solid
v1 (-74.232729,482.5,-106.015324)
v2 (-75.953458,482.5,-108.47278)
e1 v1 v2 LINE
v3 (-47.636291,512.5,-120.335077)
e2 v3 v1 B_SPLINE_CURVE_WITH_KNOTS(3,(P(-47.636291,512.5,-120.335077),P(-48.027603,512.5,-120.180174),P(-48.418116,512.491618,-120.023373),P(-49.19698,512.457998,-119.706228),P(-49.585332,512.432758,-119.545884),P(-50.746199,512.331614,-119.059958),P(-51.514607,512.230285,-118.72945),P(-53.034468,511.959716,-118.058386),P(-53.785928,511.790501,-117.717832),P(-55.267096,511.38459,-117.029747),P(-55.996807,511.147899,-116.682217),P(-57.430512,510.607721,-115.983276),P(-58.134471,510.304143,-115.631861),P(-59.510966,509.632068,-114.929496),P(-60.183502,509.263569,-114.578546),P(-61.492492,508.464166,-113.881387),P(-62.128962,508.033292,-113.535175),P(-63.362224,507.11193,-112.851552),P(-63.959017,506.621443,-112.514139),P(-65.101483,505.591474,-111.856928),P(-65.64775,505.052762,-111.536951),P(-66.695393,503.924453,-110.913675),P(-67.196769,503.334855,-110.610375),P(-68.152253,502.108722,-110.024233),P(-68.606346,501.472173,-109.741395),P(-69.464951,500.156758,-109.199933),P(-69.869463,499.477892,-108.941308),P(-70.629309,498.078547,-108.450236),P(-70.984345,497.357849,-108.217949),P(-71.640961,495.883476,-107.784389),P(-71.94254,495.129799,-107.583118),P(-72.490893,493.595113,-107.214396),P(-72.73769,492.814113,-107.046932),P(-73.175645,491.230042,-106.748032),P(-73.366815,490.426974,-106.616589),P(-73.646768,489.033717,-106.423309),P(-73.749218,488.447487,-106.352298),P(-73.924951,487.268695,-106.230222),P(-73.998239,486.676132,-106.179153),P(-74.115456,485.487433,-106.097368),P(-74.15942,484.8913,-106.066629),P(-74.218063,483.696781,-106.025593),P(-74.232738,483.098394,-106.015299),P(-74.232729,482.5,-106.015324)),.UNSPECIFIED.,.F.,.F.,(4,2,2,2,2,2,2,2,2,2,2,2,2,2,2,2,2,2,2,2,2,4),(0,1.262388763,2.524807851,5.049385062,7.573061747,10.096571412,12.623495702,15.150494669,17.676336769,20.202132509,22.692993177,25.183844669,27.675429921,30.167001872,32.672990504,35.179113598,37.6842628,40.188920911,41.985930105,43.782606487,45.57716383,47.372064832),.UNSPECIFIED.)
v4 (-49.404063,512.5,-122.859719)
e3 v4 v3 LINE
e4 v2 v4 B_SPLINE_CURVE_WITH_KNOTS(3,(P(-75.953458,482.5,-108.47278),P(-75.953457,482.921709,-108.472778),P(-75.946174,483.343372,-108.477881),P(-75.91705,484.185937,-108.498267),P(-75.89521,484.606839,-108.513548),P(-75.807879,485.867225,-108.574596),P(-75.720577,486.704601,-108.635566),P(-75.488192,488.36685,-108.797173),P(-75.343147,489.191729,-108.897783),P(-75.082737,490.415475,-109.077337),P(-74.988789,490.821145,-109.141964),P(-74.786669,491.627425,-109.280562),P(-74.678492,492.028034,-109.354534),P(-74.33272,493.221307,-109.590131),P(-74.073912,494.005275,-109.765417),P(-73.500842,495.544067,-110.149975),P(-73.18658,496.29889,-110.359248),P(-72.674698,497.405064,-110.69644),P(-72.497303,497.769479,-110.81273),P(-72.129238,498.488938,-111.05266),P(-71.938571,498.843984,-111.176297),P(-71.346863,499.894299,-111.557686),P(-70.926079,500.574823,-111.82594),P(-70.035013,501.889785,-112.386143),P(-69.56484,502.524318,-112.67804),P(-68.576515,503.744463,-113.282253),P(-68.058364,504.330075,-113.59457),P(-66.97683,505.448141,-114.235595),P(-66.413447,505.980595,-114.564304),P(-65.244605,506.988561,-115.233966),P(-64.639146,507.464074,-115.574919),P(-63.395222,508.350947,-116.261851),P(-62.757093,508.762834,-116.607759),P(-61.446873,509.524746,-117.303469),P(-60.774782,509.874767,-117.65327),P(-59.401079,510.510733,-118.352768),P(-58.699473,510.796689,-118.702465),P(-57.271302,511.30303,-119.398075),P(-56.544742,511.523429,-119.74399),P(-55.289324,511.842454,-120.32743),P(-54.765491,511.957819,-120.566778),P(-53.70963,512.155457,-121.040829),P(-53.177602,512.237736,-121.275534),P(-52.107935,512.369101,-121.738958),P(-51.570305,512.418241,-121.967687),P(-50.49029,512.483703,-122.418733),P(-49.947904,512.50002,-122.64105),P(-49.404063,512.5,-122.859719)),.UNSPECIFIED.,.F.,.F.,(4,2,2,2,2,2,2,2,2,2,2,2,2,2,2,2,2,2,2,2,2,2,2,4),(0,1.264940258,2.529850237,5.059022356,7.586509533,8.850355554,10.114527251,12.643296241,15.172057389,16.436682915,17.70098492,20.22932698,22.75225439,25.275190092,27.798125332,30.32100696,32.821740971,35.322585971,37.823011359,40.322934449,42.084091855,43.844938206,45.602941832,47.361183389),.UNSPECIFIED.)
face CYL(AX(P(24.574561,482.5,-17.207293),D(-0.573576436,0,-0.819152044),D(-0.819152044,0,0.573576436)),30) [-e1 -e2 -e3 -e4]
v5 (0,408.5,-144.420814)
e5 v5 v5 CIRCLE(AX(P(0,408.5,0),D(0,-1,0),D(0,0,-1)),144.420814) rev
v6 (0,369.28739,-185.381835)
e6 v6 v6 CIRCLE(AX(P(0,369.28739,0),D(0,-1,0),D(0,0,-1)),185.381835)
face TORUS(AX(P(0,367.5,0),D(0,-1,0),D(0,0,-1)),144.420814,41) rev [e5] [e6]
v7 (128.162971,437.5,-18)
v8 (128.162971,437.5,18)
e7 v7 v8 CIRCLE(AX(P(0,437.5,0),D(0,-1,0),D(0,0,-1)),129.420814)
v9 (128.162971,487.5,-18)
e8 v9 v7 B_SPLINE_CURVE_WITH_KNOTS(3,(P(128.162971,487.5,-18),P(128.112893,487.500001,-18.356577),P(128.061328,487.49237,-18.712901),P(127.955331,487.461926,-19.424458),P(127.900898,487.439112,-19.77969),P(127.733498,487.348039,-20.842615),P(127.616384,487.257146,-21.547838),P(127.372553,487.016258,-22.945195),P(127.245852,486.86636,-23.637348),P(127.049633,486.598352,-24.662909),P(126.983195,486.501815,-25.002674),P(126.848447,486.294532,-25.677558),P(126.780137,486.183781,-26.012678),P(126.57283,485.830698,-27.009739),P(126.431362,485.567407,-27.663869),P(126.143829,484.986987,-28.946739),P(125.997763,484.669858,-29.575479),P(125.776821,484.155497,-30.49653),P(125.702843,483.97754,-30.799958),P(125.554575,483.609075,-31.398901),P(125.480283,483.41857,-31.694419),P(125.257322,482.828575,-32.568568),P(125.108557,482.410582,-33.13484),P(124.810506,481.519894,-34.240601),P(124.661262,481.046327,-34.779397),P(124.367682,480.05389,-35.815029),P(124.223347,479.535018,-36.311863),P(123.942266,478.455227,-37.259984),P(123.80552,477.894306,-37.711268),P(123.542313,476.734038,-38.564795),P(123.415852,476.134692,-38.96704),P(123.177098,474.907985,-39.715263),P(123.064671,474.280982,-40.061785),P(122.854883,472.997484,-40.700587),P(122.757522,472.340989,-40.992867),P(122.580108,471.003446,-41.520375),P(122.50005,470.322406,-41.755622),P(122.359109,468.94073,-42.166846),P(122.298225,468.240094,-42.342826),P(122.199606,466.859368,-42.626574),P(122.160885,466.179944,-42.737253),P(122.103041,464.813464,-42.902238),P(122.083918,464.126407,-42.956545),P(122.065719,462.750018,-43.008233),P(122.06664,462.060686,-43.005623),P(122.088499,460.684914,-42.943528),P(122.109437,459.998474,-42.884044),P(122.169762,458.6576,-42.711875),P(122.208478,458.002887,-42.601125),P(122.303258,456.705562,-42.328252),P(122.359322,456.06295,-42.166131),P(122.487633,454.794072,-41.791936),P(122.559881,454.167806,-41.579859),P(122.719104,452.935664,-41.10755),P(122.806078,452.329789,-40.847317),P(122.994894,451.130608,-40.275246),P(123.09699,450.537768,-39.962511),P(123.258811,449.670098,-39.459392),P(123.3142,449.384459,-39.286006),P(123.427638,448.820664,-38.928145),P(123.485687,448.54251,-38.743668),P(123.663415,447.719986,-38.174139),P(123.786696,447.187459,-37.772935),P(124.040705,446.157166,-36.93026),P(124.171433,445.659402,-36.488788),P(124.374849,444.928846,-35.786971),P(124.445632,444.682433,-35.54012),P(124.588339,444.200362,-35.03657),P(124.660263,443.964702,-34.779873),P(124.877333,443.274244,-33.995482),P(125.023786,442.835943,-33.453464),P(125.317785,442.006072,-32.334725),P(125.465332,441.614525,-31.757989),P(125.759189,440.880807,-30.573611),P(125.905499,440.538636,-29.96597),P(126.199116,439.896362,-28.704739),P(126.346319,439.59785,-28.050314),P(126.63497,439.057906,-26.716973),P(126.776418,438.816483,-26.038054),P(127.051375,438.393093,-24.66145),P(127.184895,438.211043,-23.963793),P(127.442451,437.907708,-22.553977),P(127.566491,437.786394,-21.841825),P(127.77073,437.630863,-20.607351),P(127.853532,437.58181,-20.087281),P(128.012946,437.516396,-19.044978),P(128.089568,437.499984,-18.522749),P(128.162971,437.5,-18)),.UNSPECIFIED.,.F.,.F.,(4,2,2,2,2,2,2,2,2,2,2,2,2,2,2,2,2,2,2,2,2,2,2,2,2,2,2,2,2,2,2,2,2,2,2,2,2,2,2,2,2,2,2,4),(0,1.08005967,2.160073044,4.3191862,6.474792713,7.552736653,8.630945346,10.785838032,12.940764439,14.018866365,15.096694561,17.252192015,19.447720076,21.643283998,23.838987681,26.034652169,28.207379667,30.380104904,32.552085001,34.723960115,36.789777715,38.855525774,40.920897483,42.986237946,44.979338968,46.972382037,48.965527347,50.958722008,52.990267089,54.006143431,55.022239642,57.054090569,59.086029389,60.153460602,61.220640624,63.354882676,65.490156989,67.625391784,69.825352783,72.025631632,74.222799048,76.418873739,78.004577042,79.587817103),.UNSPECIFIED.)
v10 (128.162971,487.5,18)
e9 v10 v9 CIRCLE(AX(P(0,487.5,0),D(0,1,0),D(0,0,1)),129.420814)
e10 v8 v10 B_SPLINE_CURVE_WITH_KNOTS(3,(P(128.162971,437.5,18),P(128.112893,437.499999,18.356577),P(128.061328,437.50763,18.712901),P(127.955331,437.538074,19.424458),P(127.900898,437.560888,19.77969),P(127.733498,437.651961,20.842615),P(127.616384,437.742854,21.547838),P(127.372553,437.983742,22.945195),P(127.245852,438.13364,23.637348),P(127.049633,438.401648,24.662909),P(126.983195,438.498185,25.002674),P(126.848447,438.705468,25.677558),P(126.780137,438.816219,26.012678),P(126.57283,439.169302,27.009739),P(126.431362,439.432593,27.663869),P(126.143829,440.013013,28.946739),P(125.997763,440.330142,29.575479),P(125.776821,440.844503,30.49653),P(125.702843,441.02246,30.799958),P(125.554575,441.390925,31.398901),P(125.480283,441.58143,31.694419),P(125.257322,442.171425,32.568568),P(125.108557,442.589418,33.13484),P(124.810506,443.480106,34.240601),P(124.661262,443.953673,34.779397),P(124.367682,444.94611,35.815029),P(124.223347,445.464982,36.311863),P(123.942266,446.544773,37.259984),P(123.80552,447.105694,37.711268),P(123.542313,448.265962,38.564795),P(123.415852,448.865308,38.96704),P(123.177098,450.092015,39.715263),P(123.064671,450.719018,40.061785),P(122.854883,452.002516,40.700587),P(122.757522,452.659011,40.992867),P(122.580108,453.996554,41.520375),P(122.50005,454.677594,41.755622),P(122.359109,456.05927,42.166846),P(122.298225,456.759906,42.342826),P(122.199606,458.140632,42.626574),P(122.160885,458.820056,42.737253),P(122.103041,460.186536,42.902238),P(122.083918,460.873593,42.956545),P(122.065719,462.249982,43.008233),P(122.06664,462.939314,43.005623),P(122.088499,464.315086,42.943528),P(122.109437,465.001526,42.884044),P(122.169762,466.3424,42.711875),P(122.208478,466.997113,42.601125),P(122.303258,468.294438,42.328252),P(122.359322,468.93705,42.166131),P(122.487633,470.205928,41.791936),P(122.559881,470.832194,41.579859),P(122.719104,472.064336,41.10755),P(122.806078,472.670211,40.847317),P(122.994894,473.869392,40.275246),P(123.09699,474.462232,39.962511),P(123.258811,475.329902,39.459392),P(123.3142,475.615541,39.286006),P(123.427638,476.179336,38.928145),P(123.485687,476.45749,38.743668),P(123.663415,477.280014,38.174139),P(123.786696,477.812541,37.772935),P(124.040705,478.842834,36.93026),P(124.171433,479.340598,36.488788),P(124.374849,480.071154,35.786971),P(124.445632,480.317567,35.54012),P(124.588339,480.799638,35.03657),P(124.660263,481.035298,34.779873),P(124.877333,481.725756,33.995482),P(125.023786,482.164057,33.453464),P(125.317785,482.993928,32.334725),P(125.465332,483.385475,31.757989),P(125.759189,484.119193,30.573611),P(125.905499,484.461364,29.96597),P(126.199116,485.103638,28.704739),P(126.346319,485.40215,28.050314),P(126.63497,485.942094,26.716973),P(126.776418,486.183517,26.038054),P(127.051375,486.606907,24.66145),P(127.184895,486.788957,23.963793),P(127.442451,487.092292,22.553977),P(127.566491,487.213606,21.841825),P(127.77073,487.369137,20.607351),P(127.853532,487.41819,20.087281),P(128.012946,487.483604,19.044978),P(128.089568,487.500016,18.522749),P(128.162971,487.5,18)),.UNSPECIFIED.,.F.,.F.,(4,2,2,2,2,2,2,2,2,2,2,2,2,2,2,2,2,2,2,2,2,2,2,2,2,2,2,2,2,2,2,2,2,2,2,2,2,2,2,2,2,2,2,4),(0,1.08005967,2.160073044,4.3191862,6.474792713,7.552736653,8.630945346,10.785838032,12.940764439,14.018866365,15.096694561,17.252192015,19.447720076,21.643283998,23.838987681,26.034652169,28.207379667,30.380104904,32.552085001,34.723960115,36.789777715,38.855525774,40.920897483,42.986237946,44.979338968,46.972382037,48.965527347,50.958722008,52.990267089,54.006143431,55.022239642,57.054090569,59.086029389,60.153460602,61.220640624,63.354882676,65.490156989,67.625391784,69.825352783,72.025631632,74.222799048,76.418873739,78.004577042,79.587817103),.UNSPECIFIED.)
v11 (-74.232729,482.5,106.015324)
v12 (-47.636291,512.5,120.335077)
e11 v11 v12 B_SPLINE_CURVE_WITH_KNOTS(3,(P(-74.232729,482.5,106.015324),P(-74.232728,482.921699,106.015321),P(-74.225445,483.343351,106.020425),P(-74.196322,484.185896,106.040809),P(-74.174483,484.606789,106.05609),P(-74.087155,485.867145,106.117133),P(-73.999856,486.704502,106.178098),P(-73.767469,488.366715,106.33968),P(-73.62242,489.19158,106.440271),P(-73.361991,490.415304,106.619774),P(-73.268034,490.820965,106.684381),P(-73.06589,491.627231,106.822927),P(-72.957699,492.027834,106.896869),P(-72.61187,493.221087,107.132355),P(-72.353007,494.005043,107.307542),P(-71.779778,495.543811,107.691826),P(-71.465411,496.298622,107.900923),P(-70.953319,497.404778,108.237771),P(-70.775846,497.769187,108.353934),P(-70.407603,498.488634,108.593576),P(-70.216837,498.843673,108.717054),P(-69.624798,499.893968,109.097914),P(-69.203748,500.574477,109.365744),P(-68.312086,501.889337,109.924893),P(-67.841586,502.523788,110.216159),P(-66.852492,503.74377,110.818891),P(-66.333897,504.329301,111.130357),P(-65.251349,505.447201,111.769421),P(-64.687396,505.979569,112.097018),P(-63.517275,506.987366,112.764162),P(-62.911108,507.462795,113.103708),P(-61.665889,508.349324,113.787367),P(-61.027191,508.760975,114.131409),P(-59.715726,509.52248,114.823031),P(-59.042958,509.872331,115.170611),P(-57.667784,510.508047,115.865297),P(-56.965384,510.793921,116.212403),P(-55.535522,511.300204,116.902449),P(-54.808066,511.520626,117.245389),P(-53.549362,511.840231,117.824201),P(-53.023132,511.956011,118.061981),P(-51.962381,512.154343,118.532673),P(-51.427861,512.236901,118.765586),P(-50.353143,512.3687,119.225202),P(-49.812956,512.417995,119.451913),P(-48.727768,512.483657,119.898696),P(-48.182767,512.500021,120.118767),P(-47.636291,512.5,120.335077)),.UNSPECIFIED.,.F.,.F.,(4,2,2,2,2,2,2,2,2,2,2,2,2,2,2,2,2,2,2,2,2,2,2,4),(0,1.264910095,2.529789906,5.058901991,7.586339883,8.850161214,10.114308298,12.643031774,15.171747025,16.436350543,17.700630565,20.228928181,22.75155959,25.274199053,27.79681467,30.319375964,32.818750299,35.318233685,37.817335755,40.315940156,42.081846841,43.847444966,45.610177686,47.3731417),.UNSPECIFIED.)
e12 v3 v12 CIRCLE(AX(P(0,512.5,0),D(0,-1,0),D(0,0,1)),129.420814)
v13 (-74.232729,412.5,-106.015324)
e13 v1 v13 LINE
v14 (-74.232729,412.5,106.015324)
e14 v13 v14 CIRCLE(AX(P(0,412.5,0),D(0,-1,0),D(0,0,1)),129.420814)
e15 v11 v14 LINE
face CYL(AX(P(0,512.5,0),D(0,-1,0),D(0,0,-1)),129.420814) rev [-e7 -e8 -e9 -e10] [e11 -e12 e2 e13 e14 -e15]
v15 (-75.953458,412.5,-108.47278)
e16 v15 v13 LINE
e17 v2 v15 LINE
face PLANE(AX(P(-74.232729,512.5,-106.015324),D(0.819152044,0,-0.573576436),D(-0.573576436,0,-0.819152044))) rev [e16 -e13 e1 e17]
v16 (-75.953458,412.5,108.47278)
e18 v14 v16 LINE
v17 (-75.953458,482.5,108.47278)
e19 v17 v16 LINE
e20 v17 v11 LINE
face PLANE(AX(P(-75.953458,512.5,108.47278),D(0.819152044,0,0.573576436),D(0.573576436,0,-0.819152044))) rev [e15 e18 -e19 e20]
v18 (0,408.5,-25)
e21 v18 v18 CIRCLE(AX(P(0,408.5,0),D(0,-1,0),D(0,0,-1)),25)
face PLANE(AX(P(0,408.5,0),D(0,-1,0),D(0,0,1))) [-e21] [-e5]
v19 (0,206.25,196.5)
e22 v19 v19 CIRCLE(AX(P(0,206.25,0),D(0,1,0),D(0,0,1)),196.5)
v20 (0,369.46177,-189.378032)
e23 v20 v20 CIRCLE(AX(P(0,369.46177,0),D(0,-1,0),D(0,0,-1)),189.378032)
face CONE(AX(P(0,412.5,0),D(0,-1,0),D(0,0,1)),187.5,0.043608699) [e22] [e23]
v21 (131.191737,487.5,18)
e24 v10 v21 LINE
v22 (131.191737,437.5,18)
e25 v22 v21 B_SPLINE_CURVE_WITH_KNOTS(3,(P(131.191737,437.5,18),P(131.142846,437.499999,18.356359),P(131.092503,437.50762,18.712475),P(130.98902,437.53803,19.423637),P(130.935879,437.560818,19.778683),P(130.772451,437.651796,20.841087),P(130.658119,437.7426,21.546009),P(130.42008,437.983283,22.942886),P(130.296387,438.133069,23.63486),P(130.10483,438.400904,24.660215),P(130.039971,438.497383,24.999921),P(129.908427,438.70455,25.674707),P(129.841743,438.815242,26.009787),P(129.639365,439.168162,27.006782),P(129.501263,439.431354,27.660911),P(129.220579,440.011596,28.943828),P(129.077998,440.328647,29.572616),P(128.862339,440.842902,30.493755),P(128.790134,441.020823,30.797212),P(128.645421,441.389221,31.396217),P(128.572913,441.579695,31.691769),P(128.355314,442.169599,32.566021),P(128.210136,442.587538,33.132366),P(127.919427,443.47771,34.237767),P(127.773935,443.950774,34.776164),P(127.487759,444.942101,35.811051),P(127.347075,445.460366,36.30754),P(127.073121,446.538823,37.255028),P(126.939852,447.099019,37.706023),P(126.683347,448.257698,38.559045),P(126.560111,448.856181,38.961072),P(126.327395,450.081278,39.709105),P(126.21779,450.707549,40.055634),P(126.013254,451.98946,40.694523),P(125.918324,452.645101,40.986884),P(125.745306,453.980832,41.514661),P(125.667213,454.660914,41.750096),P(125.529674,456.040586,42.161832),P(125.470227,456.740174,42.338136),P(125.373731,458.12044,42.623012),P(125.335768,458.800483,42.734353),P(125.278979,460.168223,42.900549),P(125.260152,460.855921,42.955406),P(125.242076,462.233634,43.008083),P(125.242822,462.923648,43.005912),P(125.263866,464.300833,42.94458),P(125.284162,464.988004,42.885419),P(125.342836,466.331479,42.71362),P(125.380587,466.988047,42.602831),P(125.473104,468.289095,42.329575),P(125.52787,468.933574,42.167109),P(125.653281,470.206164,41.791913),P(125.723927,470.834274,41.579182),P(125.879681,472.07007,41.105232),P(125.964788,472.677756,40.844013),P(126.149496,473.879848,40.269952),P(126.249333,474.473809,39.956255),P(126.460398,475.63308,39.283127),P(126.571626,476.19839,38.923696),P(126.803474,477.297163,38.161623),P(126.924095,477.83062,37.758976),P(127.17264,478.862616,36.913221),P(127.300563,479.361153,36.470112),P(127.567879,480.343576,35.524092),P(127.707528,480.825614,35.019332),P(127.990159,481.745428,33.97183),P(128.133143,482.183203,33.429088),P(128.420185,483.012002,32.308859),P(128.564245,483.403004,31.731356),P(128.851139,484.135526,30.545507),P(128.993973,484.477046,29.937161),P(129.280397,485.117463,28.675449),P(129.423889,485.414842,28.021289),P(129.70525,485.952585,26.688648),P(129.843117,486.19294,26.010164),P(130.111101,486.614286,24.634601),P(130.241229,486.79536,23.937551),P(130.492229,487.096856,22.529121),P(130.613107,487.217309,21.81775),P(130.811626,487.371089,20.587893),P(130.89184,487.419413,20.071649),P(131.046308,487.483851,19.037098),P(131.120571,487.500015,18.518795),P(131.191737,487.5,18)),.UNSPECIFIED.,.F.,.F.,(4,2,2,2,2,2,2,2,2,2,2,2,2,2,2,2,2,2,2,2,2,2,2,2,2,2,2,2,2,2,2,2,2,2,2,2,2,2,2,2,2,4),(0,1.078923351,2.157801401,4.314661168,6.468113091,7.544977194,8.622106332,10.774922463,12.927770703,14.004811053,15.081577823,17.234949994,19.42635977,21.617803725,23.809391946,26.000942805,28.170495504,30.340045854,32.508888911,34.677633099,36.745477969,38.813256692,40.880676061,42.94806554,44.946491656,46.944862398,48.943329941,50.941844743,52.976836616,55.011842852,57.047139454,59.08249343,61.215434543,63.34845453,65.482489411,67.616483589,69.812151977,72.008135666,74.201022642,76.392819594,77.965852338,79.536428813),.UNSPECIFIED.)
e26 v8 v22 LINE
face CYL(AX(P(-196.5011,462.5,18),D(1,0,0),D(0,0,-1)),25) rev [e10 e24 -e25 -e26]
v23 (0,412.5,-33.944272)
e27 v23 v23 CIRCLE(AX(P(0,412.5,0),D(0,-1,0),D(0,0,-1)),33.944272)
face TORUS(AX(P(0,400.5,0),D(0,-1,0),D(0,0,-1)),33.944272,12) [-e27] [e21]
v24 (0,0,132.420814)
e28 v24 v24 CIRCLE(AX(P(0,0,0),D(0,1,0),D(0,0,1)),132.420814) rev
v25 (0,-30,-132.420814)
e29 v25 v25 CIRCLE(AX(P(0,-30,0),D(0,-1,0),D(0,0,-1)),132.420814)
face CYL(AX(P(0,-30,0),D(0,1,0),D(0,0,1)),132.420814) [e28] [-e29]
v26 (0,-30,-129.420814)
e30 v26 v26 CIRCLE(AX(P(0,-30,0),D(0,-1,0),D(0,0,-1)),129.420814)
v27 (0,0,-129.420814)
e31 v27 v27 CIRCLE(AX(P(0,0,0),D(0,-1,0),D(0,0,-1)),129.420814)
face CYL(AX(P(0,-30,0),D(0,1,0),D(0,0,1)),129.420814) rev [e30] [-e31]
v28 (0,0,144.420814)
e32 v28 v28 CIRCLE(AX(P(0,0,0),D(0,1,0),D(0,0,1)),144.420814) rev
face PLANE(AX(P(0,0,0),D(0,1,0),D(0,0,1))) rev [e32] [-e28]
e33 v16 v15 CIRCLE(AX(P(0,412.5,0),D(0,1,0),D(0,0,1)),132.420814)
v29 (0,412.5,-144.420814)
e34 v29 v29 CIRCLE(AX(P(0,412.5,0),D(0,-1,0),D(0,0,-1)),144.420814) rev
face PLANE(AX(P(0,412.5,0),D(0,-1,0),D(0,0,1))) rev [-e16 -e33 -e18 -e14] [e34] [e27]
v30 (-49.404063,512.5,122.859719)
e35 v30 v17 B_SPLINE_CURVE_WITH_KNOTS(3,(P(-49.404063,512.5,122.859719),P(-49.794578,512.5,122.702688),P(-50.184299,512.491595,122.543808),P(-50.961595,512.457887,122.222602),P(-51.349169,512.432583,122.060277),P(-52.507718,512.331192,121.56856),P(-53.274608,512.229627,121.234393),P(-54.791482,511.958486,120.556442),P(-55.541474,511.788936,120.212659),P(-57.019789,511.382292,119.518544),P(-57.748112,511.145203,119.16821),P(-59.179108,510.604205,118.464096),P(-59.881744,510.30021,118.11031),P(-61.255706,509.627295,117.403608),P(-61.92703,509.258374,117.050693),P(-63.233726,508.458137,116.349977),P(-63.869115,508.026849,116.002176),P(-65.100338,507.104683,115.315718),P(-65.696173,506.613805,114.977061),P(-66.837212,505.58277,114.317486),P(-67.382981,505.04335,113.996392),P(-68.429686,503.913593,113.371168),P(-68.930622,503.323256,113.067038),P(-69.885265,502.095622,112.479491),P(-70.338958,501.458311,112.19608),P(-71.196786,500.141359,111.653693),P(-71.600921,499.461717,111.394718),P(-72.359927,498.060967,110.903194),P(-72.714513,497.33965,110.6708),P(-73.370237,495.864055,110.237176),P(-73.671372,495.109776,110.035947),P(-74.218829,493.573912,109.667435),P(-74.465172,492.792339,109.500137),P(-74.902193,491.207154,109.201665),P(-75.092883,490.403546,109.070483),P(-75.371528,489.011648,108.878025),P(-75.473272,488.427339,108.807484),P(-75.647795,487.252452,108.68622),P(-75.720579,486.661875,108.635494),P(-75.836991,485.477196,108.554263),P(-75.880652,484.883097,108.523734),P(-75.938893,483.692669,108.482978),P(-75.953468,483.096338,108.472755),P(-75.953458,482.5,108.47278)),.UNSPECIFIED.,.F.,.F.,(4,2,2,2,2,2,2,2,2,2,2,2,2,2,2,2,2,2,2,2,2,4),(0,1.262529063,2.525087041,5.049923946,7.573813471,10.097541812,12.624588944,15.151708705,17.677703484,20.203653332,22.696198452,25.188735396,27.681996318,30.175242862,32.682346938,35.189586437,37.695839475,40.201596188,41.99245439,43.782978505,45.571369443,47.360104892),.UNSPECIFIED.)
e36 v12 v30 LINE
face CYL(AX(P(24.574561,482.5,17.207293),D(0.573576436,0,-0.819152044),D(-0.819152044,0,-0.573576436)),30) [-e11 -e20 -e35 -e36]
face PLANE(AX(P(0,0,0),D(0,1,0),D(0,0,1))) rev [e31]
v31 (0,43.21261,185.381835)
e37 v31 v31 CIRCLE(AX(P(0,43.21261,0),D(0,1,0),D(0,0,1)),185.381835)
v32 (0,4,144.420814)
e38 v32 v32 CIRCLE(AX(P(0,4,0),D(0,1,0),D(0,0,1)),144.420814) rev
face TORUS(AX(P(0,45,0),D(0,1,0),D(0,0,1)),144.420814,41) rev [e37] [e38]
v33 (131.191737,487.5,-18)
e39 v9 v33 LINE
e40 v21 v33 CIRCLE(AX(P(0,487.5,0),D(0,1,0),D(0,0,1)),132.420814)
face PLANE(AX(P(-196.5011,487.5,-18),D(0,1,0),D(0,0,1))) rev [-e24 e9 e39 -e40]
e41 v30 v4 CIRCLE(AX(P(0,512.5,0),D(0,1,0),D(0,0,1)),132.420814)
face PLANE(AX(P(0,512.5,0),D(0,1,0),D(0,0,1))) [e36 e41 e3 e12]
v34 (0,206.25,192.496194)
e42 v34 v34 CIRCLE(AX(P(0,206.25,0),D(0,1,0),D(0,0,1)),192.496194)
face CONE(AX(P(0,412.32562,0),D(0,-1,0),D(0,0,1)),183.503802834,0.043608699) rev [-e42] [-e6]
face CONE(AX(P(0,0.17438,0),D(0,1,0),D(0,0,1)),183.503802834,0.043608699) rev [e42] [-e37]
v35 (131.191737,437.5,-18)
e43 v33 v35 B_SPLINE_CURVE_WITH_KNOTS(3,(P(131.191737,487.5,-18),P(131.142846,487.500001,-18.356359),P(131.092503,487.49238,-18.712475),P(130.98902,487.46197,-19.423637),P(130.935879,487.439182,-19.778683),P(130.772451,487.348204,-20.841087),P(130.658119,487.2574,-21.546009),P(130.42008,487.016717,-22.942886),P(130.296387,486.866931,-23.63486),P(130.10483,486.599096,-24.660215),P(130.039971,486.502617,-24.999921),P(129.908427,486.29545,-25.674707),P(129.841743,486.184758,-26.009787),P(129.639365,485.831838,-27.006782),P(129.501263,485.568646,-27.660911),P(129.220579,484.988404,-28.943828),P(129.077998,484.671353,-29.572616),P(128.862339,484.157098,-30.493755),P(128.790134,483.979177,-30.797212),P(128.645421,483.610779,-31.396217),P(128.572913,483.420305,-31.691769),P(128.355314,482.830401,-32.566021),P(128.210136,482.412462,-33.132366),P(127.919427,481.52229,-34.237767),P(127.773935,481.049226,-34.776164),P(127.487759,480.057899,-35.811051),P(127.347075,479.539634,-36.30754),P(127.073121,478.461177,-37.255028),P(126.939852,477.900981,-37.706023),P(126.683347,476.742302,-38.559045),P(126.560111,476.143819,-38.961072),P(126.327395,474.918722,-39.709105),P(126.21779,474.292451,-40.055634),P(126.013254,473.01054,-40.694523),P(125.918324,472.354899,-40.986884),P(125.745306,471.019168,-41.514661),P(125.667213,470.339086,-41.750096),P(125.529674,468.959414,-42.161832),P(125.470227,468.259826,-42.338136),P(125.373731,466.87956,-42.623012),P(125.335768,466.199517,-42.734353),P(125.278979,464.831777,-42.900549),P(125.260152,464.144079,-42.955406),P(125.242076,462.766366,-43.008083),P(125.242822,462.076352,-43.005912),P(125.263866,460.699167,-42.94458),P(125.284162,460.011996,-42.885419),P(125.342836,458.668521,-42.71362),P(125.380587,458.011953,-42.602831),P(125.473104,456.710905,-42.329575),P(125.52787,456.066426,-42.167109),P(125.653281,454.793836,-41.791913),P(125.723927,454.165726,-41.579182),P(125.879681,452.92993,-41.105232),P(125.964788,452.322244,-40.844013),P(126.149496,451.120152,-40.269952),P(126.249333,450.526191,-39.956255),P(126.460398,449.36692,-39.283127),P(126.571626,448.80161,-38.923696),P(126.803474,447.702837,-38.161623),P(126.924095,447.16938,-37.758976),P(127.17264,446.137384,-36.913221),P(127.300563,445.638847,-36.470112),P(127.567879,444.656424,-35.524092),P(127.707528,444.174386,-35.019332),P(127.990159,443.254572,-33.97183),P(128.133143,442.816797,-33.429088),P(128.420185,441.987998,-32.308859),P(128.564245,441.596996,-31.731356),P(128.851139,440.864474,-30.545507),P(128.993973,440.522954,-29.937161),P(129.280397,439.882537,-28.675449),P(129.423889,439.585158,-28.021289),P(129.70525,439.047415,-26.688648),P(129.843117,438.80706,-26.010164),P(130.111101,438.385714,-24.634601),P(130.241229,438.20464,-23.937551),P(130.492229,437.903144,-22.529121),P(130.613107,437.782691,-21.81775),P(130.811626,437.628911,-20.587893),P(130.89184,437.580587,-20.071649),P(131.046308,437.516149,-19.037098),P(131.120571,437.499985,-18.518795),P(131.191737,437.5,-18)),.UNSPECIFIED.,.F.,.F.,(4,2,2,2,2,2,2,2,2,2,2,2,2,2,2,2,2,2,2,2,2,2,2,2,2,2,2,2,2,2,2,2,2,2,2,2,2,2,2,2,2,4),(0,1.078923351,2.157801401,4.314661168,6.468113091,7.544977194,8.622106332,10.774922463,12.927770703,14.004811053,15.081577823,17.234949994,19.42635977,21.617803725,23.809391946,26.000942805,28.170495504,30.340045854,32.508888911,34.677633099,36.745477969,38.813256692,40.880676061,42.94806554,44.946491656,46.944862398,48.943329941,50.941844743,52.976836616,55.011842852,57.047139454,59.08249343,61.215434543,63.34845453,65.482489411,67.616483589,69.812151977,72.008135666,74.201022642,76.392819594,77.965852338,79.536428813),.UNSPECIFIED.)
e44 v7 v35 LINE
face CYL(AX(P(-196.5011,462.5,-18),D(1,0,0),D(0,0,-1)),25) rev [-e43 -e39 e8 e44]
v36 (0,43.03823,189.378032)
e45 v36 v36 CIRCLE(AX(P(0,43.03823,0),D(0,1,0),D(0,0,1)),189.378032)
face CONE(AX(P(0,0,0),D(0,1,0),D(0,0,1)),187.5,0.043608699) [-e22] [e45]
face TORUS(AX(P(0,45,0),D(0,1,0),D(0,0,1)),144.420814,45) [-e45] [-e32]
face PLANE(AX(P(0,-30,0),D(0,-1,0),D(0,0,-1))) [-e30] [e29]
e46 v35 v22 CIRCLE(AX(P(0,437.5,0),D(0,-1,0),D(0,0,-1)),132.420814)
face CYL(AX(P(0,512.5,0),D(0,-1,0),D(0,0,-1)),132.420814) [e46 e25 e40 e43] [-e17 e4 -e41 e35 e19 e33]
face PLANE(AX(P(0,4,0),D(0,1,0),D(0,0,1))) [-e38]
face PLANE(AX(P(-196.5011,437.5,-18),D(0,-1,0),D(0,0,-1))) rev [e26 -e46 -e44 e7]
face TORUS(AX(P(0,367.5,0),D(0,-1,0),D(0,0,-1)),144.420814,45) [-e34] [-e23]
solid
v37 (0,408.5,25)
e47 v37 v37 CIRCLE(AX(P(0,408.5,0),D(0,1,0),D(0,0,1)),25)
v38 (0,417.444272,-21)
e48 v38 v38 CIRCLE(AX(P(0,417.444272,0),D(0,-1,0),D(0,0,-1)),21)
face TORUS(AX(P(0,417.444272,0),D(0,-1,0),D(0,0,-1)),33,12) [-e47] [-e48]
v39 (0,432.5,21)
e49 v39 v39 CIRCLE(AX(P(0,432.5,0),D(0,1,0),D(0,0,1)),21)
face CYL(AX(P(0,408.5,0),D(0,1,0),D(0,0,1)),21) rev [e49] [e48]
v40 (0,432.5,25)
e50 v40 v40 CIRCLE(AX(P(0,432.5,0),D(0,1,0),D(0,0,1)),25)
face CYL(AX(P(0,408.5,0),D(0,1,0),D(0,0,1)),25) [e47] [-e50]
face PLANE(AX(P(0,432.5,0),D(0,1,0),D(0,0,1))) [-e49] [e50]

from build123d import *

# Parameters (mm, degrees)
SKETCH2_R                = 196.5
SKETCH1_R                = 187.50000000000006
FILLET1_R                = 45
CUT_EXTRUDE2_START       = -4
CUT_EXTRUDE2_OUTLINE_R   = 25
CUT_EXTRUDE2_DEPTH       = 4
BOSS_EXTRUDE3_DEPTH      = 20
BOSS_EXTRUDE3_DEPTH_BACK = 4
SKETCH8_R                = 25
SKETCH8_R_2              = 21
FILLET6_R                = 12
FILLET7_R                = 12
SKETCH9_R                = 132.4208137637083
SKETCH9_R_2              = 129.4208137637083
BOSS_EXTRUDE4_DEPTH      = 30
BOSS_EXTRUDE5_START      = 100
BOSS_EXTRUDE5_DEPTH      = 100
FILLET8_START            = -133
FILLET8_DEPTH            = 200.891870951
FILLET8_2_DEPTH          = 200.700119068
CUT_EXTRUDE3_REACH       = 641.889
CUT_EXTRUDE3_END_RADIUS  = 129.42081376370834


with BuildPart() as part:
    # Sketch2 → Loft1 section 0
    with BuildSketch(Plane(origin=(0, 206.25, 0), x_dir=(1, 0, 0), z_dir=(0, 1, 0))):
        Circle(SKETCH2_R)
    # Sketch1 → Loft1 section 1
    with BuildSketch(Plane(origin=(0, 0, 0), x_dir=(1, 0, 0), z_dir=(0, 1, 0))):
        Circle(SKETCH1_R)
    loft1 = loft()

    # Mirror1: Loft1 across plane
    add(loft1.mirror(Plane.ZX.offset(206.25)))

    # Fillet1
    fillet1_edges = [part.edges().sort_by_distance(p)[0] for p in [
        (-187.50000000000006, 0, -2.296e-14),
        (-187.50000000000006, 412.5, -2.296e-14),
    ]]
    fillet(fillet1_edges, radius=FILLET1_R)

    # Shell1: read off the stored shape, not the designer's step
    # Shell1 outline → Shell1 (revolve, cut)
    with BuildSketch(Plane.XY):
        with BuildLine():
            Line((0, 408.5), (0, 4))
            Line((0, 4), (144.420813764, 4))
            ThreePointArc((144.420813764, 4), (172.773212338, 15.383425331), (185.38183471, 43.212609995))
            Line((185.38183471, 43.212609995), (192.496193547, 206.25))
            Line((192.496193547, 206.25), (185.38183471, 369.287390005))
            ThreePointArc((185.38183471, 369.287390005), (172.773212338, 397.116574669), (144.420813764, 408.5))
            Line((144.420813764, 408.5), (0, 408.5))
        make_face()
    revolve(axis=Axis((0, 0, 0), (0, 1, 0)), mode=Mode.SUBTRACT)

    # Cut-Extrude2: read off the stored shape, not the designer's step
    # Cut-Extrude2 outline → Cut-Extrude2 (cut)
    with BuildSketch(Plane(origin=(0, 412.5, 0), x_dir=(1, 0, 0), z_dir=(0, 1, 0)).offset(CUT_EXTRUDE2_START)):
        Circle(CUT_EXTRUDE2_OUTLINE_R)
    extrude(amount=CUT_EXTRUDE2_DEPTH, mode=Mode.SUBTRACT)

    # Fillet7
    # the kernel refuses this fillet: 12 mm, written as the material it takes off along each edge
    with BuildSketch(Plane(origin=(0, 412.5, 0), x_dir=(1, 0, 0), z_dir=(0, 0, 1))) as fillet7_piece_1:
        with BuildLine():
            CenterArc((33.94427190999916, -12), FILLET7_R, 90, 48.18968510422141)
            Line((25, -4), (24.821114561800016, -3.839999999999975))
            ThreePointArc((24.821114561800016, -3.839999999999975), (24.76, -2), (24.76, 0))
            Line((24.76, 0), (25, 0.2400000000000091))
            Line((25, 0.2400000000000091), (33.94427190999916, 0.2400000000000091))
            Line((33.94427190999916, 0.2400000000000091), (33.94427190999916, 0))
        make_face()
    revolve(axis=Axis((0, 412.5, 0), (0, 1, 0)), mode=Mode.SUBTRACT)

    # Sketch9 → Boss-Extrude4 (add)
    with BuildSketch(Plane.XZ):
        with Locations(Location((0, 0, 0), (0, 0, 90))):
            Circle(SKETCH9_R)
        with Locations(Location((0, 0, 0), (0, 0, 270))):
            Circle(SKETCH9_R_2, mode=Mode.SUBTRACT)
    extrude(amount=BOSS_EXTRUDE4_DEPTH)

    # Sketch10 → Boss-Extrude5 (add)
    with BuildSketch(Plane(origin=(0, 412.5, 0), x_dir=(1, 0, 0), z_dir=(0, 1, 0)).offset(BOSS_EXTRUDE5_START)):
        with BuildLine():
            Line((-75.95345845729307, -108.47278030095376), (-74.23272914823994, -106.01532416808678))
            ThreePointArc((-74.23272914823994, -106.01532416808678), (129.42081376370834, 5.747e-14), (-74.23272914824004, 106.01532416808674))
            Line((-74.23272914824004, 106.01532416808674), (-75.95345845729317, 108.4727803009537))
            ThreePointArc((-75.95345845729317, 108.4727803009537), (132.42081376370834, 5.881e-14), (-75.95345845729307, -108.47278030095376))
        make_face()
    extrude(amount=-BOSS_EXTRUDE5_DEPTH)

    # Fillet8: read off the stored shape, not the designer's step
    # Fillet8 outline → Fillet8 (cut)
    with BuildSketch(Plane(origin=(0, 0, 0), x_dir=(0.8191520442889931, 0, -0.5735764363510442), z_dir=(0.5735764363510442, 0, 0.8191520442889932)).offset(FILLET8_START)):
        with BuildLine():
            Line((0, 512.5), (0, 482.5))
            ThreePointArc((0, 482.5), (8.786796564, 503.713203436), (30, 512.5))
            Line((30, 512.5), (0, 512.5))
        make_face()
    extrude(amount=FILLET8_DEPTH, mode=Mode.SUBTRACT)

    # Fillet8 2 outline → Fillet8 2 (cut)
    with BuildSketch(Plane(origin=(0, 0, 0), x_dir=(0.8191520442889947, 0, 0.5735764363510419), z_dir=(0.5735764363510419, 0, -0.8191520442889948)).offset(FILLET8_START)):
        with BuildLine():
            ThreePointArc((30, -512.5), (8.786796564, -503.713203436), (0, -482.5))
            Line((0, -482.5), (0, -512.5))
            Line((0, -512.5), (30, -512.5))
        make_face()
    extrude(amount=FILLET8_2_DEPTH, mode=Mode.SUBTRACT)

    # Cut-Extrude3: up to this cylinder (the profile starts outside it)
    cut_extrude3_end = Plane(origin=(0, 462.5, 0), z_dir=(0, -1, 0)) * Cylinder(CUT_EXTRUDE3_END_RADIUS, 1543.6196275274167, mode=Mode.PRIVATE)
    # Sketch11 → Cut-Extrude3 (cut, up to the surface)
    with BuildSketch(Plane(origin=(132.42081376370834, 0, 0), x_dir=(0, 0, -1), z_dir=(1, 0, 0)), mode=Mode.PRIVATE) as cut_extrude3_sk1:
        with BuildLine():
            Line((18.000000000000057, 437.5), (-18.00000000000005, 437.5))
            ThreePointArc((-18.00000000000005, 437.5), (-43.00000000000006, 462.49999999999994), (-18.000000000000053, 487.49999999999994))
            Line((-18.000000000000053, 487.49999999999994), (17.999999999999932, 487.5))
            ThreePointArc((17.999999999999932, 487.5), (43, 462.5), (18.000000000000057, 437.5))
        make_face()
    cut_extrude3_tool1 = extrude(cut_extrude3_sk1.sketch, amount=-CUT_EXTRUDE3_REACH, mode=Mode.PRIVATE) - cut_extrude3_end
    add(cut_extrude3_tool1.solids().sort_by_distance((132.420814, 462.5, 0))[0], mode=Mode.SUBTRACT)


with BuildPart() as body_2:
    # Sketch8 → Boss-Extrude3 (new, two sides: drawn at the far end of the back side and taken through both)
    with BuildSketch(Plane(origin=(0, 412.5, 0), x_dir=(1, 0, 0), z_dir=(0, 1, 0)).offset(-BOSS_EXTRUDE3_DEPTH_BACK)):
        with Locations(Location((0, 0, 0), (0, 0, 270))):
            Circle(SKETCH8_R)
        with Locations(Location((0, 0, 0), (0, 0, 270))):
            Circle(SKETCH8_R_2, mode=Mode.SUBTRACT)
    extrude(amount=BOSS_EXTRUDE3_DEPTH + BOSS_EXTRUDE3_DEPTH_BACK)

    # Fillet6
    # the kernel refuses this fillet: 12 mm, written as the material it takes off along each edge
    with BuildSketch(Plane(origin=(0, 408.5, 0), x_dir=(-1.8e-16, 0, 1), z_dir=(-1, 0, -1.8e-16))) as fillet6_piece_1:
        with BuildLine():
            CenterArc((33, 8.944271909999145), FILLET6_R, 180, 48.189685104221326)
            Line((21, 8.944271909999145), (20.76, 8.944271909999145))
            Line((20.76, 8.944271909999145), (20.76, 0))
            Line((20.76, 0), (21, -0.2400000000000091))
            ThreePointArc((21, -0.2400000000000091), (22.999999999999996, -0.2400000000000091), (24.839999999999993, -0.17888543819998404))
            Line((24.839999999999993, -0.17888543819998404), (24.999999999999993, 0))
        make_face()
    revolve(axis=Axis((0, 408.5, 0), (0, 1, 0)), mode=Mode.SUBTRACT)


solid = Compound([part.part, body_2.part])
